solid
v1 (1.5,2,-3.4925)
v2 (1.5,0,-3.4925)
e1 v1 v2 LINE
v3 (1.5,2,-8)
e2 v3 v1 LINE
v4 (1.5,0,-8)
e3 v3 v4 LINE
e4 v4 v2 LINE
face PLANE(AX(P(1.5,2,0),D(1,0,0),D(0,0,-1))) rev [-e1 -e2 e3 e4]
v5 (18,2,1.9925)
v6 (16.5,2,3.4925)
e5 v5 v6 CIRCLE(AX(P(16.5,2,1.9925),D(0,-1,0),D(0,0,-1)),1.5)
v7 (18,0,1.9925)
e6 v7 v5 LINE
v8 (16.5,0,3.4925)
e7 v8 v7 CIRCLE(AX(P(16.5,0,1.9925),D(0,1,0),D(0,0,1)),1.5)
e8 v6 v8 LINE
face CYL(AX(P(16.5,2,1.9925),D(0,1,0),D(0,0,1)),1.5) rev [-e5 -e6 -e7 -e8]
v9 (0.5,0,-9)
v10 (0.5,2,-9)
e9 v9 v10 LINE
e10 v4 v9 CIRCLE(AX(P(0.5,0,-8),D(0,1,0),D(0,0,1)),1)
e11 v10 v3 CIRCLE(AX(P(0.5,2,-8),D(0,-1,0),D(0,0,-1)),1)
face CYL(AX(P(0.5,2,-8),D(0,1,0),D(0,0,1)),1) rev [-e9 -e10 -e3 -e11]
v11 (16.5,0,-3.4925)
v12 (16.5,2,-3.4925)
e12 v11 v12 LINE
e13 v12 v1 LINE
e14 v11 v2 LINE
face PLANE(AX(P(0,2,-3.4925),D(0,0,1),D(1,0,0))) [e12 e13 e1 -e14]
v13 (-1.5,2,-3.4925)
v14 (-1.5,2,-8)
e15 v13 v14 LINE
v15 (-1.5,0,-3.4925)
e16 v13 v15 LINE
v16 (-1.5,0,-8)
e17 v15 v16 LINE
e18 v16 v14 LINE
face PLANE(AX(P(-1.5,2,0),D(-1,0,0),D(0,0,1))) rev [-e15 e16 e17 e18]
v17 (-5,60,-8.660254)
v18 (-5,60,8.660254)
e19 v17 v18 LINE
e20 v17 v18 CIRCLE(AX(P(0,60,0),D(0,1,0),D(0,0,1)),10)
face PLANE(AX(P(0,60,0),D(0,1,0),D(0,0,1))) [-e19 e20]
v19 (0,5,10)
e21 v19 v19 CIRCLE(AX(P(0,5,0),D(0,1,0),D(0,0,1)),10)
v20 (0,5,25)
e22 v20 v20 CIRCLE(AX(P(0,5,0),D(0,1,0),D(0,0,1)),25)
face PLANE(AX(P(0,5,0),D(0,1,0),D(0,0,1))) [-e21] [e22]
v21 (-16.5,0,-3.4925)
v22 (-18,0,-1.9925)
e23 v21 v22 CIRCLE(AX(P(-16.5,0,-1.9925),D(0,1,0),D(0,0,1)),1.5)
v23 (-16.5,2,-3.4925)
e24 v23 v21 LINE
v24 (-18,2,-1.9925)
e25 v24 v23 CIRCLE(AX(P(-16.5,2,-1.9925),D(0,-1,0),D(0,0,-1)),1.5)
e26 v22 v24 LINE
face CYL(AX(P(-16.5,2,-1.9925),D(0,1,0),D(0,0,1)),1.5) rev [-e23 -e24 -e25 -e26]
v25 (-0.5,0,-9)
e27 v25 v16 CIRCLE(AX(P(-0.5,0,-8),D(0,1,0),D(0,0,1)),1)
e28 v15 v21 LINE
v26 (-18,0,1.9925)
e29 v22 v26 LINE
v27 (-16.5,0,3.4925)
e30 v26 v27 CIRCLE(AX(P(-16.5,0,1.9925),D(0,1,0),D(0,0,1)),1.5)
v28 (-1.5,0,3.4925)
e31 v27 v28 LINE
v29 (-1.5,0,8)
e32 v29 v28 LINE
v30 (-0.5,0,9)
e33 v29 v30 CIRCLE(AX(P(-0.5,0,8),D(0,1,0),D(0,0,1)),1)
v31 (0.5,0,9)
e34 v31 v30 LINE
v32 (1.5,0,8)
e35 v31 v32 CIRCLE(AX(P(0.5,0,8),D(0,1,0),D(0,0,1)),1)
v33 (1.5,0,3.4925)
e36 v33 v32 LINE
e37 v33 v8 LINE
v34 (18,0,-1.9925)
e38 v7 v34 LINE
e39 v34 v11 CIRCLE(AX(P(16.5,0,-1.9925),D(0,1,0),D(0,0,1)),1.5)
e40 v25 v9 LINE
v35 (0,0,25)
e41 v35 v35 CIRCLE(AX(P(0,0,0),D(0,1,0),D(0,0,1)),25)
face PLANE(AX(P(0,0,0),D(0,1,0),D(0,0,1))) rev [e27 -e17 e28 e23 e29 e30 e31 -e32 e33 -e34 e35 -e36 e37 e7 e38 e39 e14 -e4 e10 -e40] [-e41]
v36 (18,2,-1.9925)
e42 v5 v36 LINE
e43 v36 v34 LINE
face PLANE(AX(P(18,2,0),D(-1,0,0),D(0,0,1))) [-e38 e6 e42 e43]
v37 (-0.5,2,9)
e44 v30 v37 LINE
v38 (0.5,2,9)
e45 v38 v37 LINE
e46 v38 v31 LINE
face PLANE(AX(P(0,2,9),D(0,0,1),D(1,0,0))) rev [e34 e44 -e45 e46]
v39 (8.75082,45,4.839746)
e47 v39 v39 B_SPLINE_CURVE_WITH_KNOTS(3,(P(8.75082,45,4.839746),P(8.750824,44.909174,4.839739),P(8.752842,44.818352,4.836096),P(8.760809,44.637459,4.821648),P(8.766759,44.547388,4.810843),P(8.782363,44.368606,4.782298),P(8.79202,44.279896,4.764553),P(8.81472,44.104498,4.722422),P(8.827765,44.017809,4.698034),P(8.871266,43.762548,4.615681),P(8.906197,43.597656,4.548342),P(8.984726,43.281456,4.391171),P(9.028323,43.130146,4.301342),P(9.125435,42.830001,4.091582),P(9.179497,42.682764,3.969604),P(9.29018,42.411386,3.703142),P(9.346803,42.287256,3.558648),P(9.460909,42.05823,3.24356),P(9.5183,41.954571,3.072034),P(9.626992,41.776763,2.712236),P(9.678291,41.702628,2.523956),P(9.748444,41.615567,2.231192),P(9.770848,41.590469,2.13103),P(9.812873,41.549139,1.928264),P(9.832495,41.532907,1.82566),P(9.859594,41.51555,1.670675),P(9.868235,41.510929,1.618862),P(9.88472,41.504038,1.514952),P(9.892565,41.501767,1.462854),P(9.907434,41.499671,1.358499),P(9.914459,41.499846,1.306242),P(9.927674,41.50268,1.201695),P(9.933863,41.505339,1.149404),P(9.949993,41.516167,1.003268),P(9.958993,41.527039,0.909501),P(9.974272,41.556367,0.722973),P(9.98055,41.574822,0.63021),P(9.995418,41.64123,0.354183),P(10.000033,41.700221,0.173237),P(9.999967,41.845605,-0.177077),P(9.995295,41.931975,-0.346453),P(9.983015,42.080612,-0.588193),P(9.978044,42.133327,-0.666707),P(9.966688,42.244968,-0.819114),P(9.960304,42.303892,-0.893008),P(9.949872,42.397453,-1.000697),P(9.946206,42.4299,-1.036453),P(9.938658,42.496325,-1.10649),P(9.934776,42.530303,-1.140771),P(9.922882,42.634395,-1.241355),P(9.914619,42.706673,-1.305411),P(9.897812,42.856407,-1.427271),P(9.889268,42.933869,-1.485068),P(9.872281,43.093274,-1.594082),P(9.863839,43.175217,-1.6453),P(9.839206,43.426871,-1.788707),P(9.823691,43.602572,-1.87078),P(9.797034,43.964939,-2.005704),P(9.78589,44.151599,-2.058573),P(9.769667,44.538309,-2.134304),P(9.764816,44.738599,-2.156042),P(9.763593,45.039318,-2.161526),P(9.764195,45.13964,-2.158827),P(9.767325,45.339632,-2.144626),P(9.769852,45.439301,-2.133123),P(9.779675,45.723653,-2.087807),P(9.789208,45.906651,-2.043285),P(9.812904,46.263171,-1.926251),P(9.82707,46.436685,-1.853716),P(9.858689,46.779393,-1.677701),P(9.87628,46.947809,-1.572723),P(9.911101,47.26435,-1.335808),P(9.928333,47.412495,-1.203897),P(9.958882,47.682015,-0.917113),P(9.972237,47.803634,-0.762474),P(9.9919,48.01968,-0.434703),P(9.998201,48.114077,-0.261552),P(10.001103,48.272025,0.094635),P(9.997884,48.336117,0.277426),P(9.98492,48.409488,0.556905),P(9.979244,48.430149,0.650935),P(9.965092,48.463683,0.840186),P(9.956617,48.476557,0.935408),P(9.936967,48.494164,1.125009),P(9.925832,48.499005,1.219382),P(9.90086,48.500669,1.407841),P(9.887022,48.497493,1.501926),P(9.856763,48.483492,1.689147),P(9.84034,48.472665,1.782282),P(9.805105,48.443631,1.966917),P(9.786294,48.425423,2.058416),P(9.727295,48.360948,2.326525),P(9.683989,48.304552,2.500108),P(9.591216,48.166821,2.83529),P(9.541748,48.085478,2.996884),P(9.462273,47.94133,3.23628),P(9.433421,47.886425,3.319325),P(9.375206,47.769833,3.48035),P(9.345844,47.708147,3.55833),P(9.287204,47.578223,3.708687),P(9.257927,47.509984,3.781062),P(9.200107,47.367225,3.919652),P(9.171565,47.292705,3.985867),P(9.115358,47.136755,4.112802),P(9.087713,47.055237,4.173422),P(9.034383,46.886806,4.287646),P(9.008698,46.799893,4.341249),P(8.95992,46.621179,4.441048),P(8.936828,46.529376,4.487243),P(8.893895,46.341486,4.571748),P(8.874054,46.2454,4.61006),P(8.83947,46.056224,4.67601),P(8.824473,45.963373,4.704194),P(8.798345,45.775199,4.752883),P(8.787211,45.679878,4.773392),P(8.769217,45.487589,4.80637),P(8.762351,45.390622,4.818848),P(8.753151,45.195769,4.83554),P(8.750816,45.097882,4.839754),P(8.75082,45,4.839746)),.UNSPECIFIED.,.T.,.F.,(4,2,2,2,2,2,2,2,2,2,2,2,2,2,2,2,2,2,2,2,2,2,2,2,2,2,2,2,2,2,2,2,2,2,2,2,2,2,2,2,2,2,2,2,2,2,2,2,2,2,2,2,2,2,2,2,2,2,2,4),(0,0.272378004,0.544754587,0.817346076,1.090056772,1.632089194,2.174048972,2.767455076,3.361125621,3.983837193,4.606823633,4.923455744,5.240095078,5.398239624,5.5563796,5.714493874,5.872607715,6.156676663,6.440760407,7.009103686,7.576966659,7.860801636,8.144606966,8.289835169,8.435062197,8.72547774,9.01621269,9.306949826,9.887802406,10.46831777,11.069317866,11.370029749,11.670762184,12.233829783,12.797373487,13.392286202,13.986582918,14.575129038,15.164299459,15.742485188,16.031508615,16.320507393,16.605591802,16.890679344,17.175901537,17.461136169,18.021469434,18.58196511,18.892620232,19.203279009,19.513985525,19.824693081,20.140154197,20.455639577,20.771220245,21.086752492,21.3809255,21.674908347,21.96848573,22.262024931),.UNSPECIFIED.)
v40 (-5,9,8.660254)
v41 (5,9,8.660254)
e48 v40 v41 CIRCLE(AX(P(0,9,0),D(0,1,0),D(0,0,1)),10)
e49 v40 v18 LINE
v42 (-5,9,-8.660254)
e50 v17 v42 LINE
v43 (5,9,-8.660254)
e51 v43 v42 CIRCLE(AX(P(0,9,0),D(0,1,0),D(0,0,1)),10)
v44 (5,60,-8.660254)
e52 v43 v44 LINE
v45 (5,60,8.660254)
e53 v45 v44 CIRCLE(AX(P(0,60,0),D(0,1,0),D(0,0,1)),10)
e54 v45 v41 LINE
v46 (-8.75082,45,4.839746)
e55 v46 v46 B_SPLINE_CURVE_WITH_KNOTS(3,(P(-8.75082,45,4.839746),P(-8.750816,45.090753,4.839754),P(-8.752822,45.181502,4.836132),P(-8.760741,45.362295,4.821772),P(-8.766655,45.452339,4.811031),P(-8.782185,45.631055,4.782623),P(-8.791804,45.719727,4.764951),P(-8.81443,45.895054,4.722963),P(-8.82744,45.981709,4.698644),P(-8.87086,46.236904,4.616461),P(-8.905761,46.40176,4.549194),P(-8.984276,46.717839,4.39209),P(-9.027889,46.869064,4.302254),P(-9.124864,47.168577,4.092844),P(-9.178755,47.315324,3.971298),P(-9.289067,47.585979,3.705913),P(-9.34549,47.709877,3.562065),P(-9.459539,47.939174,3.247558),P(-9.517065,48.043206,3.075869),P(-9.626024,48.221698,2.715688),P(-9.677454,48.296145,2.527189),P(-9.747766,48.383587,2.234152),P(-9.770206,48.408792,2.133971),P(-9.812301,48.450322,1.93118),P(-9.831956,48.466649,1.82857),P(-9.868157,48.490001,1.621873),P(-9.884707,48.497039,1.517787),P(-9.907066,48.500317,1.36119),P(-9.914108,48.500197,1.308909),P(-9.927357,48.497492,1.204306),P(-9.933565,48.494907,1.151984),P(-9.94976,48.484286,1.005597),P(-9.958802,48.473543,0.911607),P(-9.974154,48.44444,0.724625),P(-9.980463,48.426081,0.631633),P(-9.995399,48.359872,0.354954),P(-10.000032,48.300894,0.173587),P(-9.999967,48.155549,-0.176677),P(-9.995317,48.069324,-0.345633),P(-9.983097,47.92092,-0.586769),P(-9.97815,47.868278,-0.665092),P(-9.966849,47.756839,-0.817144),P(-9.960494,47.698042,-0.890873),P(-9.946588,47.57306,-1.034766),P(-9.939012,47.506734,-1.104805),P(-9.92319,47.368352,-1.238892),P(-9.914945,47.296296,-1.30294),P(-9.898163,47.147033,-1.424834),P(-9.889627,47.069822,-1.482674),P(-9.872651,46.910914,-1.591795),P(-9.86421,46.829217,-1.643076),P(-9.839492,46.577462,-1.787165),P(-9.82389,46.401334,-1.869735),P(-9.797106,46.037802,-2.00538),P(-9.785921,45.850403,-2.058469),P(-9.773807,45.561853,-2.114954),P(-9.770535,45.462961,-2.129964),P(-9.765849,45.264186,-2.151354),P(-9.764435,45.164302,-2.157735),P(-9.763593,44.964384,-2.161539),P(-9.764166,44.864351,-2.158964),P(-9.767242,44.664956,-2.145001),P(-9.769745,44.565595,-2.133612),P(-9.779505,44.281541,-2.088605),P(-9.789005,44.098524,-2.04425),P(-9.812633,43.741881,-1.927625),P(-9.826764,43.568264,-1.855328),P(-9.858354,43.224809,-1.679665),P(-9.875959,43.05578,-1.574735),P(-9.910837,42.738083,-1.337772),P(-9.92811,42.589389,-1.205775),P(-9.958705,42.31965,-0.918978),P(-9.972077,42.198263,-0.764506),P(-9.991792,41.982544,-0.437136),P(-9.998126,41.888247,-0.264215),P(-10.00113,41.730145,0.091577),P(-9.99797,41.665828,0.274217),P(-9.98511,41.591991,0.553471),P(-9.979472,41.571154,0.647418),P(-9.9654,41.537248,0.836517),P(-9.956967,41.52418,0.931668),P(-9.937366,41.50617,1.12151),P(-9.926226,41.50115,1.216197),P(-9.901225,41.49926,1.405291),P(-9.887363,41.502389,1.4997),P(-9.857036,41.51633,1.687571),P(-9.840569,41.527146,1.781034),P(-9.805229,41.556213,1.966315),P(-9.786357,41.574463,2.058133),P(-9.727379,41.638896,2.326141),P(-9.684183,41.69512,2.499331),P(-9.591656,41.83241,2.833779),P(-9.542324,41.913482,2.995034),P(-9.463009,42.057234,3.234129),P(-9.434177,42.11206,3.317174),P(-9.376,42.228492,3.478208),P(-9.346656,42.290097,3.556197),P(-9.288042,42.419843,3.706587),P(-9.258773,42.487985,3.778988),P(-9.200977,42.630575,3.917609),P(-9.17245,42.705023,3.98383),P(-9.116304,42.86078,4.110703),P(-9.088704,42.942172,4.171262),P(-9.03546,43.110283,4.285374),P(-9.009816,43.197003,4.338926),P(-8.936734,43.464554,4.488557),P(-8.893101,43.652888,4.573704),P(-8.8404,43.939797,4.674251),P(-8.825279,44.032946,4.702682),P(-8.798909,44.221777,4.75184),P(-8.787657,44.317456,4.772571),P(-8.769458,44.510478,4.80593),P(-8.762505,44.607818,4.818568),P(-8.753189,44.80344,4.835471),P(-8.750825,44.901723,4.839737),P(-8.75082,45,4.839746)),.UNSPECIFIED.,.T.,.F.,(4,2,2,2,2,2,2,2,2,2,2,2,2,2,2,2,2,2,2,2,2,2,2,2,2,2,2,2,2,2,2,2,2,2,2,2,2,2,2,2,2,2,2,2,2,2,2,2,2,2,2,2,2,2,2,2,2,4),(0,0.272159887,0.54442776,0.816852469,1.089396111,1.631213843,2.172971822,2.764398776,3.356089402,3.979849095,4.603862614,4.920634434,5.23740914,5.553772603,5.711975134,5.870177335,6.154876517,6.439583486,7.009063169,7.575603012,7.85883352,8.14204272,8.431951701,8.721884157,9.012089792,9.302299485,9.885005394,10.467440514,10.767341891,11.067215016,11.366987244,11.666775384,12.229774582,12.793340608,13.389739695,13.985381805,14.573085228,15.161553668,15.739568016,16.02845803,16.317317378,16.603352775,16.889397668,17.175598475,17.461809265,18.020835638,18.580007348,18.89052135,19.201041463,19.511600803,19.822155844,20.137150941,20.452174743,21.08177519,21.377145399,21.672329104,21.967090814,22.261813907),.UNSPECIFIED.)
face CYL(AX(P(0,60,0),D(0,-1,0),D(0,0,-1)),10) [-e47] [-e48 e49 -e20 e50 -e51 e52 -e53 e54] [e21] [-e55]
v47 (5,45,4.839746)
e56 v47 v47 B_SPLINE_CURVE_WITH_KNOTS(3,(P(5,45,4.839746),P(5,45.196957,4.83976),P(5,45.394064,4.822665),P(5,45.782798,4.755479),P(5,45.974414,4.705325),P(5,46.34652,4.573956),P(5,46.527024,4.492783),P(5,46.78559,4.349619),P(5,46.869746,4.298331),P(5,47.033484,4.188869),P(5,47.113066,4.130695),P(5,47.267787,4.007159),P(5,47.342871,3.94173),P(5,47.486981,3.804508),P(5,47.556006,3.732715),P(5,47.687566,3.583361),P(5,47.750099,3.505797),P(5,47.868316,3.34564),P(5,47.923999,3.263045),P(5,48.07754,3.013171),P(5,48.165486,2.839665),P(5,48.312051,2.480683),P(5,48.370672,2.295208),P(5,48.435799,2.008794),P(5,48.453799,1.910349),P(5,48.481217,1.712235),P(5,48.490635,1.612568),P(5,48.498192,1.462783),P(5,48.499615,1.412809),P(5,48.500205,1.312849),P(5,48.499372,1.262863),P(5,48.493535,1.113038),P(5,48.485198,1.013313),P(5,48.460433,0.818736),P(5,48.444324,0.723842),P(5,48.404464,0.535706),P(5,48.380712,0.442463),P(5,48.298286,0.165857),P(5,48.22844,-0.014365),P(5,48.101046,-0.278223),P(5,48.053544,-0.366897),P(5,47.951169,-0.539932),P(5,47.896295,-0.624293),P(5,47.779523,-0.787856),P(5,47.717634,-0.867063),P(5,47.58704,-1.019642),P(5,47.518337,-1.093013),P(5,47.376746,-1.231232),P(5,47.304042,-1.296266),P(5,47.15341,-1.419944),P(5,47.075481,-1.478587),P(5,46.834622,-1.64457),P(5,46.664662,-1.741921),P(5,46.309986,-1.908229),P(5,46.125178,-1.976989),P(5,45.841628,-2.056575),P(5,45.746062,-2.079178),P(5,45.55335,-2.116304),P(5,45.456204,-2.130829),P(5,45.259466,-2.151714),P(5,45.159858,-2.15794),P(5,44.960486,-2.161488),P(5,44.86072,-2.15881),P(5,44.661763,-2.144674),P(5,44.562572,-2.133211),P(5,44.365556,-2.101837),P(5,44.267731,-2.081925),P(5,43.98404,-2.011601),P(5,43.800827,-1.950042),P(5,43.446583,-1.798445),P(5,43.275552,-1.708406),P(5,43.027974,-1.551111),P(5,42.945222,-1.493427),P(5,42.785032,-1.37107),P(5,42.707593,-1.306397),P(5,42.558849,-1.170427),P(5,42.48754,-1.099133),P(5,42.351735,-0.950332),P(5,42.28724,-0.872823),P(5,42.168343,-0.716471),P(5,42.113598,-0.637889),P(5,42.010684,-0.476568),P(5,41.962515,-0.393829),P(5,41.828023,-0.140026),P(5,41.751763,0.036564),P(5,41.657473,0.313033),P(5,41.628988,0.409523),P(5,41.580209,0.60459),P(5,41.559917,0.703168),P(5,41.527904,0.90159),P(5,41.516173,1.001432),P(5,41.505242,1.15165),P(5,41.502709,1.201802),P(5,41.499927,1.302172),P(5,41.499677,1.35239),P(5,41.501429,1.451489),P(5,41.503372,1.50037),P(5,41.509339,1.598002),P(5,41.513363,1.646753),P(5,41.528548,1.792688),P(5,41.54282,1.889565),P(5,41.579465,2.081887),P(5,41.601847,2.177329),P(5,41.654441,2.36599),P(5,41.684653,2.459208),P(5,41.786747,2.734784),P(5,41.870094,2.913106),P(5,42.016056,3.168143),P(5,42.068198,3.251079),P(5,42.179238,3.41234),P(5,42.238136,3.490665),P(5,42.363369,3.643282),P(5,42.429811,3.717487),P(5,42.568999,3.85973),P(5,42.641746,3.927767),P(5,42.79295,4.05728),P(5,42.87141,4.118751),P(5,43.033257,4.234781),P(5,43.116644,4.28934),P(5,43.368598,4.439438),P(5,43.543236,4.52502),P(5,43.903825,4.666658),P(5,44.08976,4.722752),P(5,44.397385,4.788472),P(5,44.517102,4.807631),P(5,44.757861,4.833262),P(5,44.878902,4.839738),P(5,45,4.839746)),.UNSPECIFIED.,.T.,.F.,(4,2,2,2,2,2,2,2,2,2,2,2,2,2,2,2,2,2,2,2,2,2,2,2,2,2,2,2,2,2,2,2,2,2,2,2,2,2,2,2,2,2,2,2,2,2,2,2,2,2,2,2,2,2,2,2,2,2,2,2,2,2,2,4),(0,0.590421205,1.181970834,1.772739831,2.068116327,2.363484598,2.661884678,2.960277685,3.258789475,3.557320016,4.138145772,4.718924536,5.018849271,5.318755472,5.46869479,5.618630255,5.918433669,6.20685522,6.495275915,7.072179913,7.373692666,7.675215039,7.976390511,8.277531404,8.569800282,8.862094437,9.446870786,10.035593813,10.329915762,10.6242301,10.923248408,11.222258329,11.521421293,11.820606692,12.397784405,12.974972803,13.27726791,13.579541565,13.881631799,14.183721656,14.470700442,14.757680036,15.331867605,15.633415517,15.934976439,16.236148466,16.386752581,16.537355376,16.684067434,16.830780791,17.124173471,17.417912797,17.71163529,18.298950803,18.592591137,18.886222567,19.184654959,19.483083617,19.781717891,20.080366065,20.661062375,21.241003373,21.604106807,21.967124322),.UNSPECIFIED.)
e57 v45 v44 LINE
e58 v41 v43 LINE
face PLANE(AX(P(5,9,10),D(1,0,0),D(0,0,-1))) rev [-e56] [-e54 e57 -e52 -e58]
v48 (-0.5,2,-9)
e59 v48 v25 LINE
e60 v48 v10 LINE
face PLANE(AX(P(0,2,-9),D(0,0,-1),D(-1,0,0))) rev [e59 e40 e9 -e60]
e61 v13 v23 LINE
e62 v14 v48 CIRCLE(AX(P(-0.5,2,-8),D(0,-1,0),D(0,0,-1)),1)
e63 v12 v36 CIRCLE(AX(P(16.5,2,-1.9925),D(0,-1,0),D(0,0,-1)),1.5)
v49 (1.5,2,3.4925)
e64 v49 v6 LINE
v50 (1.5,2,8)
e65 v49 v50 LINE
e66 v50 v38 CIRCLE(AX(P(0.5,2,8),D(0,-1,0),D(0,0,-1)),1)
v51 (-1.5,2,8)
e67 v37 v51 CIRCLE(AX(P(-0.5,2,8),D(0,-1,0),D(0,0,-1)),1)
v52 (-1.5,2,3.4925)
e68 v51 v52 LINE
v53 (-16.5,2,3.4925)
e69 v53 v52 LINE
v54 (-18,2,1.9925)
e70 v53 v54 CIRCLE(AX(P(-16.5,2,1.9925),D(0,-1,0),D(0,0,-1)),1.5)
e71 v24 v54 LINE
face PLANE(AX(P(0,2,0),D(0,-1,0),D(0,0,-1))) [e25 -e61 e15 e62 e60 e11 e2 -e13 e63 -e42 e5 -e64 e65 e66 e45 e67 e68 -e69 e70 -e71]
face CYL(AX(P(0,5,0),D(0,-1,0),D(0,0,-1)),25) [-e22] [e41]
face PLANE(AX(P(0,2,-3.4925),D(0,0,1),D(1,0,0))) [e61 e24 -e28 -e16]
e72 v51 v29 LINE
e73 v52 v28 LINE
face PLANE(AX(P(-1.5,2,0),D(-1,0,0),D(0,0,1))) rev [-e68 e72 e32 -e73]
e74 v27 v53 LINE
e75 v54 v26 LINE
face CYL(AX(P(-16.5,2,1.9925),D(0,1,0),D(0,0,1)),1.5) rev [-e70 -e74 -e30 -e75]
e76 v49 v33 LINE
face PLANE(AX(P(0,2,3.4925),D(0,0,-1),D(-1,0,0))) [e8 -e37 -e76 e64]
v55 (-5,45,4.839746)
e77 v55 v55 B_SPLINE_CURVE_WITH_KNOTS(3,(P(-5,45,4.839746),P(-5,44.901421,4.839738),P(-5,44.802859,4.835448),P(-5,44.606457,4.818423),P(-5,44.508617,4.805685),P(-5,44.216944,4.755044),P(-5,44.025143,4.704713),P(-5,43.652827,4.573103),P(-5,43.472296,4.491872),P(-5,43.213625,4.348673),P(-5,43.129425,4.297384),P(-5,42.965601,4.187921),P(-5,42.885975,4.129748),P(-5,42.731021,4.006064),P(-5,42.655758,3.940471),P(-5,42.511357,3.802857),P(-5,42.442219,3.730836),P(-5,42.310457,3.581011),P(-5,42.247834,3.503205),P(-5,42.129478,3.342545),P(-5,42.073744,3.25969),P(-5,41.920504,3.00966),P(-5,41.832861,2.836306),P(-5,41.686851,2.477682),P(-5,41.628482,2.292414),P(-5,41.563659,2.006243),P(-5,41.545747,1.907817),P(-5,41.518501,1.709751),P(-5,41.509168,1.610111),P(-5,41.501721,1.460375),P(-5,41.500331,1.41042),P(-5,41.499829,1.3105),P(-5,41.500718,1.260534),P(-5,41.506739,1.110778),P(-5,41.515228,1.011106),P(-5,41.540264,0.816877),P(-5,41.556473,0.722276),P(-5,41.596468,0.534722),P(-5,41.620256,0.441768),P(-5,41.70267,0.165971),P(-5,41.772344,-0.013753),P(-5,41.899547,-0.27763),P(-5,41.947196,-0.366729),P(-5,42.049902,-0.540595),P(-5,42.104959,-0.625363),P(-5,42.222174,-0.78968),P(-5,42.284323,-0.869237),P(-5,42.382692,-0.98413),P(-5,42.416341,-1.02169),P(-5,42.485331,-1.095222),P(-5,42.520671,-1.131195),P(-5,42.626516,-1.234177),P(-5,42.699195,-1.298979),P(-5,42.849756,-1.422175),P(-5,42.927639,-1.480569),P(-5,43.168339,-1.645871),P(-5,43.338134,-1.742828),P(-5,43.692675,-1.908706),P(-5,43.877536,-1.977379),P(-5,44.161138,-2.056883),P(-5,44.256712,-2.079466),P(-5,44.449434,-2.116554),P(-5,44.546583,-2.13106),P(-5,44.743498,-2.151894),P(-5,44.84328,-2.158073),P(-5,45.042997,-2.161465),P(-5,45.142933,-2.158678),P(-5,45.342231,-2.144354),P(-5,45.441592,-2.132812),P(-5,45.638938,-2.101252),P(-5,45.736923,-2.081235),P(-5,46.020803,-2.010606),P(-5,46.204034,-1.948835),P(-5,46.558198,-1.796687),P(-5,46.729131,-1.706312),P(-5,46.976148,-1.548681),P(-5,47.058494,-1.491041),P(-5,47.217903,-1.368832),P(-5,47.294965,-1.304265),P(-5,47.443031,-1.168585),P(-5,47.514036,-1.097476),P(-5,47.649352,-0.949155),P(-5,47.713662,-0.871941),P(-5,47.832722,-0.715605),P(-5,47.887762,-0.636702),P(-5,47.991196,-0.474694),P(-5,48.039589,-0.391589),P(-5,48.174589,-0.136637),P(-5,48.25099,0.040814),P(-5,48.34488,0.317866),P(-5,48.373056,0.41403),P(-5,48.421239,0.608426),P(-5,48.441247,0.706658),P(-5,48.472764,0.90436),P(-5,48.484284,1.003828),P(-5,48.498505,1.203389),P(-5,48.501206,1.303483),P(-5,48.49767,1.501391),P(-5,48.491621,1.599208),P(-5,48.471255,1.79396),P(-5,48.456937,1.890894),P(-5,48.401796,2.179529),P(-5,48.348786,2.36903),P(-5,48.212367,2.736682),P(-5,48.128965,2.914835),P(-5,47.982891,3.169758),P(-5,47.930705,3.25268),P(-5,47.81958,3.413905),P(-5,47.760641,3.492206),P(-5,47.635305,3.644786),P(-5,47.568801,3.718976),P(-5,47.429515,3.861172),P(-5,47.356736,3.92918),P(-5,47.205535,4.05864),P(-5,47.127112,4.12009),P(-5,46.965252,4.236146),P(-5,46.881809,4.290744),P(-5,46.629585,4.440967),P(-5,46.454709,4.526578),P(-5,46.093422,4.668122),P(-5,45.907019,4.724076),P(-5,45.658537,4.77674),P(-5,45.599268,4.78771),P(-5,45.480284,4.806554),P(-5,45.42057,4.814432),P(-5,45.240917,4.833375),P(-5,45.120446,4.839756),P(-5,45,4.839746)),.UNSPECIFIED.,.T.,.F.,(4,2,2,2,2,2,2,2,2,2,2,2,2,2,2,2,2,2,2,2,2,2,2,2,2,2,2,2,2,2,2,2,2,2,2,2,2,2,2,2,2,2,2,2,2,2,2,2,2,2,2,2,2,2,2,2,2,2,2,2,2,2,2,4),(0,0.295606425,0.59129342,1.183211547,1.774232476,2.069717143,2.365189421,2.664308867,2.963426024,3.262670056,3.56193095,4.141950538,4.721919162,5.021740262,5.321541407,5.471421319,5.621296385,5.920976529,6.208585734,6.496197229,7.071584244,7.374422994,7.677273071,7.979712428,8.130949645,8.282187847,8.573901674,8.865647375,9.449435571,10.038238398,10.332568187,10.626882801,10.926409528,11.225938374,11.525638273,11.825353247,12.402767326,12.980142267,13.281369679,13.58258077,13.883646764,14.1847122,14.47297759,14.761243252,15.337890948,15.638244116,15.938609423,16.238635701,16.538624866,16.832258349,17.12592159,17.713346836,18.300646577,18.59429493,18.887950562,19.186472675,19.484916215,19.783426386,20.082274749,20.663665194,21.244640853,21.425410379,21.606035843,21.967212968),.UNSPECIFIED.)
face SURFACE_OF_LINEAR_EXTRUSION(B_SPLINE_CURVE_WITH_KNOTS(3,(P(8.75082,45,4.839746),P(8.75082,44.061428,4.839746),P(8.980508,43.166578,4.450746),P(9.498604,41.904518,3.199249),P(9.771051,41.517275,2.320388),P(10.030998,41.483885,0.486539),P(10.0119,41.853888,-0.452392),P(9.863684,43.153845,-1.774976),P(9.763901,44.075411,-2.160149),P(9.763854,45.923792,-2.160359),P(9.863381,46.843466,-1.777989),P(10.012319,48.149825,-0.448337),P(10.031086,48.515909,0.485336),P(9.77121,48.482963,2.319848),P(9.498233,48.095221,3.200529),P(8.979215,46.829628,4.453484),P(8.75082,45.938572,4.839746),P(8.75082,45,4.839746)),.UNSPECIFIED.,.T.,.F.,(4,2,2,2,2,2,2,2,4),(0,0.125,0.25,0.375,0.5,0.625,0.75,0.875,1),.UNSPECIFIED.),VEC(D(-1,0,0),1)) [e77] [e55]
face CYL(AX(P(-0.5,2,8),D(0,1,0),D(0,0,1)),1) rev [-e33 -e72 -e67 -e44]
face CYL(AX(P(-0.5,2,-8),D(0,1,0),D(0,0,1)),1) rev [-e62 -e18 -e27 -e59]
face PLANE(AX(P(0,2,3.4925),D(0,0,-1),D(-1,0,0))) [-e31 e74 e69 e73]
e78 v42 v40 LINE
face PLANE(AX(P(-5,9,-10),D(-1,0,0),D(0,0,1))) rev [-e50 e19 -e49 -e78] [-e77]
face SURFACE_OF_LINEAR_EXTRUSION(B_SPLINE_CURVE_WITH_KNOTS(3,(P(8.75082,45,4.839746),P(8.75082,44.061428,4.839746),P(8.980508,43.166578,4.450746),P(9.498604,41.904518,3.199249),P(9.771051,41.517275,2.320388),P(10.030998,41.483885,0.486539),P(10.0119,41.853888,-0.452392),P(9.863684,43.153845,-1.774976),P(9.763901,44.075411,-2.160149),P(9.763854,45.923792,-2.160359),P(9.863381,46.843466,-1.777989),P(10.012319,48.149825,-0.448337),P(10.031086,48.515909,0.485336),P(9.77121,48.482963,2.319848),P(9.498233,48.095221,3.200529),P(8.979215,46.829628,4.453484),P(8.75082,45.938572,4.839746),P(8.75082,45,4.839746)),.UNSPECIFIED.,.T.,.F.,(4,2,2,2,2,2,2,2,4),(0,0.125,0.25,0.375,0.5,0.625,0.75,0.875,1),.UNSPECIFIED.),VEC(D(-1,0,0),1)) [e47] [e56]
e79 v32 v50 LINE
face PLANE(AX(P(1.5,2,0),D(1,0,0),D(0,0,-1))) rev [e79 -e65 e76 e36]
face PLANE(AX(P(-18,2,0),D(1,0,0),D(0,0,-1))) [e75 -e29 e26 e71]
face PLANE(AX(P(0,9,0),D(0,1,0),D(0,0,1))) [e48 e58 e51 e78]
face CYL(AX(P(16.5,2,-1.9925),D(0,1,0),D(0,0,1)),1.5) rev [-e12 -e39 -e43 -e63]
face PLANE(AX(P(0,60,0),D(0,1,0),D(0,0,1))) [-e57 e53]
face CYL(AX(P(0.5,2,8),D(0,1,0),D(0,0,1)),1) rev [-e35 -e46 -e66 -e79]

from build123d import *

# Parameters (mm, degrees)
SKETCH1_R           = 10
BOSS_EXTRUDE1_DEPTH = 60
SKETCH1_5_R         = 25
SKETCH1_5_R_2       = 10
BOSS_EXTRUDE3_DEPTH = 5
SKETCH6_W           = 10
SKETCH6_H           = 20
CUT_EXTRUDE2_DEPTH  = 51
CUT_EXTRUDE3_START  = -10.0000001
CUT_EXTRUDE3_DEPTH  = 20.000000175
SKETCH8_W           = 1.5
SKETCH8_H           = 5.5075
SKETCH8_H_2         = 3.4925
SKETCH8_W_2         = 16.5
CUT_EXTRUDE4_DEPTH  = 2
FILLET2_R           = 1.5
FILLET3_R           = 1


# Read off the part's stored shape, not the designer's step: Cut-Extrude3
with BuildPart() as part:
    # Sketch1 → Boss-Extrude1 (new body)
    with BuildSketch(Plane(origin=(0, 0, 0), x_dir=(1, 0, 0), z_dir=(0, 1, 0))):
        with Locations(Location((0, 0, 0), (0, 0, 270))):
            Circle(SKETCH1_R)
    extrude(amount=BOSS_EXTRUDE1_DEPTH)

    # Sketch1<5> → Boss-Extrude3 (add)
    with BuildSketch(Plane(origin=(0, 0, 0), x_dir=(1, 0, 0), z_dir=(0, 1, 0))):
        with Locations(Location((0, 0, 0), (0, 0, 270))):
            Circle(SKETCH1_5_R)
        with Locations(Location((0, 0, 0), (0, 0, 270))):
            Circle(SKETCH1_5_R_2, mode=Mode.SUBTRACT)
    extrude(amount=BOSS_EXTRUDE3_DEPTH)

    # Sketch6 → Cut-Extrude2 (cut)
    with BuildSketch(Plane(origin=(0, 60, 0), x_dir=(1, 0, 0), z_dir=(0, 1, 0))):
        Rectangle(SKETCH6_W, SKETCH6_H)
    extrude(amount=-CUT_EXTRUDE2_DEPTH, mode=Mode.SUBTRACT)

    # Cut-Extrude3 outline → Cut-Extrude3 (cut)
    with BuildSketch(Plane(origin=(0, 0, 0), x_dir=(0, 0, -1), z_dir=(1, 0, 0)).offset(CUT_EXTRUDE3_START)):
        with BuildLine():
            add(Edge.make_bspline(
                [(-4.839745962, 45), (-4.839745962, 44.061427817), (-4.450746498, 43.166577946), (-3.199248606, 41.904517699), (-2.320388043, 41.517275442), (-0.486539081, 41.483884635), (0.452391521, 41.853887629), (1.774975913, 43.153845226), (2.16014876, 44.075410749), (2.16035927, 45.923792027), (1.777989156, 46.84346553), (0.448336969, 48.149824894), (-0.485336071, 48.515908682), (-2.319848282, 48.482962757), (-3.200529308, 48.095220586), (-4.45348427, 46.829628074), (-4.839745962, 45.938572183), (-4.839745962, 45)],
                knots=[0, 0, 0, 0, 0.125, 0.125, 0.25, 0.25, 0.375, 0.375, 0.5, 0.5, 0.625, 0.625, 0.75, 0.75, 0.875, 0.875, 1, 1, 1, 1], degree=3))
        make_face()
    extrude(amount=CUT_EXTRUDE3_DEPTH, mode=Mode.SUBTRACT)

    # Sketch8 → Cut-Extrude4 (cut)
    with BuildSketch(Plane.XZ):
        with Locations((-0.75, -6.24625)):
            Rectangle(SKETCH8_W, SKETCH8_H)
        with Locations((0.75, -6.24625)):
            Rectangle(SKETCH8_W, SKETCH8_H)
        with Locations((0.75, -1.74625)):
            Rectangle(SKETCH8_W, SKETCH8_H_2)
        with Locations((-0.75, -1.74625)):
            Rectangle(SKETCH8_W, SKETCH8_H_2)
        with Locations((9.75, -1.74625)):
            Rectangle(SKETCH8_W_2, SKETCH8_H_2)
        with Locations((9.75, 1.74625)):
            Rectangle(SKETCH8_W_2, SKETCH8_H_2)
        with Locations((0.75, 1.74625)):
            Rectangle(SKETCH8_W, SKETCH8_H_2)
        with Locations((-0.75, 1.74625)):
            Rectangle(SKETCH8_W, SKETCH8_H_2)
        with Locations((0.75, 6.24625)):
            Rectangle(SKETCH8_W, SKETCH8_H)
        with Locations((-0.75, 6.24625)):
            Rectangle(SKETCH8_W, SKETCH8_H)
        with Locations((-9.75, 1.74625)):
            Rectangle(SKETCH8_W_2, SKETCH8_H_2)
        with Locations((-9.75, -1.74625)):
            Rectangle(SKETCH8_W_2, SKETCH8_H_2)
    extrude(amount=-CUT_EXTRUDE4_DEPTH, mode=Mode.SUBTRACT)

    # Fillet2
    fillet2_edges = [part.edges().sort_by_distance(p)[0] for p in [
        (18, 1, 3.4925),
        (18, 1, -3.4925),
        (-18, 1, -3.4925),
        (-18, 1, 3.4925),
    ]]
    fillet(fillet2_edges, radius=FILLET2_R)

    # Fillet3
    fillet3_edges = [part.edges().sort_by_distance(p)[0] for p in [
        (1.5, 1, -9),
        (-1.5, 1, -9),
        (-1.5, 1, 9),
        (1.5, 1, 9),
    ]]
    fillet(fillet3_edges, radius=FILLET3_R)


solid = part.part
